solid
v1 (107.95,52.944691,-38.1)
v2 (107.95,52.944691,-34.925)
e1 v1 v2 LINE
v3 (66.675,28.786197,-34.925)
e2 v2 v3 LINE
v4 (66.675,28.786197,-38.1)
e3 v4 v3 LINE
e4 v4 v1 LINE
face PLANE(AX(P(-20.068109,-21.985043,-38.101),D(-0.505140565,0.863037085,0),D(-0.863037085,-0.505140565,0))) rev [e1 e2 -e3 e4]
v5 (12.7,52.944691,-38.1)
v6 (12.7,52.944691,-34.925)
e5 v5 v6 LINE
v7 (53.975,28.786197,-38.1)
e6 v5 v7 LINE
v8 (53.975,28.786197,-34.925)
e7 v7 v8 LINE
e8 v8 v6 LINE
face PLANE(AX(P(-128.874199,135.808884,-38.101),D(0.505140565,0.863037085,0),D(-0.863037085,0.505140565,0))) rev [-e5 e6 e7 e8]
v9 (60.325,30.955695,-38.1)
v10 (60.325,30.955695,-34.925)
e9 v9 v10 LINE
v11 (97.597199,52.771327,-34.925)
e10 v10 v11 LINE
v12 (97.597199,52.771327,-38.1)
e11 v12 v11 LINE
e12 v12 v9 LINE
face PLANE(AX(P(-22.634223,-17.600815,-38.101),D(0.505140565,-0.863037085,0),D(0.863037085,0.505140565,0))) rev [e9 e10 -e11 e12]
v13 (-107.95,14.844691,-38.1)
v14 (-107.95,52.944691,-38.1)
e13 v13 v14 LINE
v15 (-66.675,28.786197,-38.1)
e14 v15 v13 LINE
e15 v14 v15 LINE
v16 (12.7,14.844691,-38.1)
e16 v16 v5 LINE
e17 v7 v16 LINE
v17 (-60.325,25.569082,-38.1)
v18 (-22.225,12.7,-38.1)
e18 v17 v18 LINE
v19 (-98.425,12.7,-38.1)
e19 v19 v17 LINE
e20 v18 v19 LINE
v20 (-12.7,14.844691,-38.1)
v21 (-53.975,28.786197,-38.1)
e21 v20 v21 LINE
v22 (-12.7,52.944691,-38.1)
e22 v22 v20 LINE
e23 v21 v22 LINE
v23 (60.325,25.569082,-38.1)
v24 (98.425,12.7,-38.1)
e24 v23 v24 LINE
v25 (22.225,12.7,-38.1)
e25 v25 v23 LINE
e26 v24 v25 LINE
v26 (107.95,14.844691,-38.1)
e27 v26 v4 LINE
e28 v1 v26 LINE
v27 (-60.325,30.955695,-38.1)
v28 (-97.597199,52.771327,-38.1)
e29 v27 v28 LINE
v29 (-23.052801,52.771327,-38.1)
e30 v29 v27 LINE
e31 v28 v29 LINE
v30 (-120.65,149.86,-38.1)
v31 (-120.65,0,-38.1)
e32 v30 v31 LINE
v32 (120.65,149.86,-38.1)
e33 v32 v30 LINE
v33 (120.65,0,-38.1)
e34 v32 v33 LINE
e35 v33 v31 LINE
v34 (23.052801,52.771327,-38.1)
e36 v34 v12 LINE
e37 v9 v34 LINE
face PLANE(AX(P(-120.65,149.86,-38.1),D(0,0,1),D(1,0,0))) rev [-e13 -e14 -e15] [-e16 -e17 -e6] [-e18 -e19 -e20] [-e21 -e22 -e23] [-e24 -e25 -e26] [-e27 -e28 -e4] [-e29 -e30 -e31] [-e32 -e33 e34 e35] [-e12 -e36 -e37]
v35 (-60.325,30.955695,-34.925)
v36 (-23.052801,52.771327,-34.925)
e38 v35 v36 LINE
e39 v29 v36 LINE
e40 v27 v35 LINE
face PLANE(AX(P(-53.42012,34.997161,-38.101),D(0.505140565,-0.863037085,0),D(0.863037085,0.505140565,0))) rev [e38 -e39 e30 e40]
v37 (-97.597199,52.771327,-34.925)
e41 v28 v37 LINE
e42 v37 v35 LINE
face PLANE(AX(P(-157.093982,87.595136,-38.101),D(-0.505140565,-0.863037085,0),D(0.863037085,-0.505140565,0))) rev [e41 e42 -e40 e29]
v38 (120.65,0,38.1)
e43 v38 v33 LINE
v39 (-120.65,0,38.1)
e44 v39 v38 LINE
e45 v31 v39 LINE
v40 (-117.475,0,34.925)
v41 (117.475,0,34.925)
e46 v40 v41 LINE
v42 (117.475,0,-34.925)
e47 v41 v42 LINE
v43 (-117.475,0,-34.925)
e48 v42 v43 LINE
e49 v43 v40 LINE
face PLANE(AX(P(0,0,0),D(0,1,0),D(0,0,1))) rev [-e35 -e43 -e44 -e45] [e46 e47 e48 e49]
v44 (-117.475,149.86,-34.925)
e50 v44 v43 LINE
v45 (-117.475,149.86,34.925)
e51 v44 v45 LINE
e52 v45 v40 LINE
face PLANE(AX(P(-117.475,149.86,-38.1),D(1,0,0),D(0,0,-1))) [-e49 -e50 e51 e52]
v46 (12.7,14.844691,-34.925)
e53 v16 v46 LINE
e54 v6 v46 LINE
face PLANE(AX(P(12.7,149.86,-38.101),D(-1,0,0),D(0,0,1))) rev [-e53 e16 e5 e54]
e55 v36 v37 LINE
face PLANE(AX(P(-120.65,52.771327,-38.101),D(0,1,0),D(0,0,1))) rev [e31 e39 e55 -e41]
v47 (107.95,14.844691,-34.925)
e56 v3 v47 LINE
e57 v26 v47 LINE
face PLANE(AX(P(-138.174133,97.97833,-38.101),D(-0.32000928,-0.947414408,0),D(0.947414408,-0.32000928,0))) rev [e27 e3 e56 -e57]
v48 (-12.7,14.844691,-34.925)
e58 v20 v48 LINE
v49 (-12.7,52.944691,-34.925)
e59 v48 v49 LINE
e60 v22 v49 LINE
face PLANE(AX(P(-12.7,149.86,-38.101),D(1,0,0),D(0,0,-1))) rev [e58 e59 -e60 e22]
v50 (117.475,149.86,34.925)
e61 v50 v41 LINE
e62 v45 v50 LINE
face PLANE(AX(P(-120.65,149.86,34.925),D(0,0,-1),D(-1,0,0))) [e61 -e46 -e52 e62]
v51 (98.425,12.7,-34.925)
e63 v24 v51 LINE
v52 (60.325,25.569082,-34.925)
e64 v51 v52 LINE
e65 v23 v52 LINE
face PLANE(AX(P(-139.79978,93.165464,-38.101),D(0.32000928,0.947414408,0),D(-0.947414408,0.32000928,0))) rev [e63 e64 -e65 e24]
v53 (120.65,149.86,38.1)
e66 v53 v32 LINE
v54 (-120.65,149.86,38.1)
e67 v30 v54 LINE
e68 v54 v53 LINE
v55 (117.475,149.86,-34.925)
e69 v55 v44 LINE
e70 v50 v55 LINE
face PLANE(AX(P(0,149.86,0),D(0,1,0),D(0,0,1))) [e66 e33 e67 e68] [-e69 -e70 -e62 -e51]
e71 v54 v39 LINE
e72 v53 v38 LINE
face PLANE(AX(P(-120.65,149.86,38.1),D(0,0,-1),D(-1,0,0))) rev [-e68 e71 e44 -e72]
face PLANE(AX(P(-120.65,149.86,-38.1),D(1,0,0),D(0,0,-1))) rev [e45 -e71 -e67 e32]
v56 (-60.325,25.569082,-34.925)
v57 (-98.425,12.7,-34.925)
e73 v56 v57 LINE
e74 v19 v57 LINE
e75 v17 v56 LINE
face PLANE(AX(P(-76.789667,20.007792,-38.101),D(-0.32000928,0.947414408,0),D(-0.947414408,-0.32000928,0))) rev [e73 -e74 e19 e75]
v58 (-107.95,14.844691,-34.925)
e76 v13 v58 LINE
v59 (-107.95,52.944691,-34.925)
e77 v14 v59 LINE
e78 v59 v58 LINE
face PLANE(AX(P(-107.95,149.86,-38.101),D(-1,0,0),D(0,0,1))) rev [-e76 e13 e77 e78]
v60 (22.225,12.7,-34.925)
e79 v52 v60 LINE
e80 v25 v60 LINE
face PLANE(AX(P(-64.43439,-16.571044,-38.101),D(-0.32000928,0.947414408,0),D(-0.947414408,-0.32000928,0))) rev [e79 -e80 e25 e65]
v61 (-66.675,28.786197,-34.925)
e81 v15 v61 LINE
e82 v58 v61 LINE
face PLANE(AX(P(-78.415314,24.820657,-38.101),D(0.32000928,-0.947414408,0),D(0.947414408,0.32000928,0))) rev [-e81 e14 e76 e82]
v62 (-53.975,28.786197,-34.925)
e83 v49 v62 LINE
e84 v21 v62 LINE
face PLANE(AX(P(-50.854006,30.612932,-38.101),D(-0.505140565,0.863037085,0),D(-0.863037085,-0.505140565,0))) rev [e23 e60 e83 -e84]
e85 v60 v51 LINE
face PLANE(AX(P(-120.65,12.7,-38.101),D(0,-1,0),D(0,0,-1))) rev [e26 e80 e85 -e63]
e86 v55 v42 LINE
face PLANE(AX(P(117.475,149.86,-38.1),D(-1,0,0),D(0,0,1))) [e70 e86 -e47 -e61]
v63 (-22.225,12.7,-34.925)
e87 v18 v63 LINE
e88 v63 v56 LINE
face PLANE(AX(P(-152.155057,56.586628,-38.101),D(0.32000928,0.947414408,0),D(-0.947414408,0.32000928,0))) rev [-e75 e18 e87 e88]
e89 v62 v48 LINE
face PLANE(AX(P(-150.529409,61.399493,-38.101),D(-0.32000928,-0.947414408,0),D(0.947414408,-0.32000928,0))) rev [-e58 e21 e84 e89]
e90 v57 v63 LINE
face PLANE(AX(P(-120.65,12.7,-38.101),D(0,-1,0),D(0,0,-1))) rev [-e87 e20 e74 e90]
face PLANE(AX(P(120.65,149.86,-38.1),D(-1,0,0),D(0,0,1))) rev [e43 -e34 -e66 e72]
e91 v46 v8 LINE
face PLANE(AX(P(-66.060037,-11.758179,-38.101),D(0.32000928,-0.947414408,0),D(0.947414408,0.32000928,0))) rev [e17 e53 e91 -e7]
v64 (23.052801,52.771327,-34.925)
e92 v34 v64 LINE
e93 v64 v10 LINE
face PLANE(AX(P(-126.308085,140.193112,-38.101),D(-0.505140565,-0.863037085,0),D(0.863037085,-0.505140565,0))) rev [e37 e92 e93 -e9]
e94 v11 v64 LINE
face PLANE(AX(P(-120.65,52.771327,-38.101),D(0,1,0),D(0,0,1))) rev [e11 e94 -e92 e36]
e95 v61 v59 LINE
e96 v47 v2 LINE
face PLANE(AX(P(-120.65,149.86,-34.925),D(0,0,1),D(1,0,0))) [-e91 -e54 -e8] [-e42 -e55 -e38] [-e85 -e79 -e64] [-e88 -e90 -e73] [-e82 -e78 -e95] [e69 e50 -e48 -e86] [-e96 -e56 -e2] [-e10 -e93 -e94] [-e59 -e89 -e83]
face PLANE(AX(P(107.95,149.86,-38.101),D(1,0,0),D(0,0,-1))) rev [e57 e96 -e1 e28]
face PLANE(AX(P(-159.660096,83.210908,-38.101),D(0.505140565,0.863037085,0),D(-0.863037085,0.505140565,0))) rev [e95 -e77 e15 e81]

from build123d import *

# Parameters (mm, degrees)
SKETCH1_W           = 241.3
SKETCH1_H           = 76.2
SKETCH1_W_2         = 205.74
SKETCH1_H_2         = 5.588
BOSS_EXTRUDE1_DEPTH = 149.86
SHELL1_T            = -3.175
CUT_EXTRUDE1_REACH  = 281.957
CUT_EXTRUDE1_START  = -73.025


with BuildPart() as part:
    # Sketch1 → Boss-Extrude1 (new body)
    with BuildSketch(Plane(origin=(0, 0, 0), x_dir=(1, 0, 0), z_dir=(0, 1, 0))):
        Rectangle(SKETCH1_W, SKETCH1_H)
        Rectangle(SKETCH1_W_2, SKETCH1_H_2, mode=Mode.SUBTRACT)
    extrude(amount=BOSS_EXTRUDE1_DEPTH)

    # Shell1
    shell1_openings = [part.faces().sort_by_distance(p)[0] for p in [
        (0, 0, -35.569542927),
        (0, 74.93, -2.794),
        (0, 74.93, 2.794),
        (-102.87, 74.93, 0),
        (102.87, 74.93, 0),
        (0, 149.86, -35.569542927),
    ]]
    offset(amount=SHELL1_T, openings=shell1_openings, kind=Kind.INTERSECTION)

    # Sketch3 → Cut-Extrude1 (cut, up to next)
    with BuildSketch(Plane.XY.offset(38.1).offset(CUT_EXTRUDE1_START), mode=Mode.PRIVATE) as cut_extrude1_sk1:
        Polygon((107.95, 52.944691481), (66.675, 28.786196813), (107.95, 14.844691481), align=None)
    cut_extrude1_tool1 = extrude(cut_extrude1_sk1.sketch, amount=-CUT_EXTRUDE1_REACH, mode=Mode.PRIVATE) & part.part
    # Sketch3 → Cut-Extrude1 (cut, up to next)
    with BuildSketch(Plane.XY.offset(38.1).offset(CUT_EXTRUDE1_START), mode=Mode.PRIVATE) as cut_extrude1_sk2:
        Polygon((98.425, 12.7), (60.325, 25.569081846), (22.225, 12.7), align=None)
    cut_extrude1_tool2 = extrude(cut_extrude1_sk2.sketch, amount=-CUT_EXTRUDE1_REACH, mode=Mode.PRIVATE) & part.part
    # Sketch3 → Cut-Extrude1 (cut, up to next)
    with BuildSketch(Plane.XY.offset(38.1).offset(CUT_EXTRUDE1_START), mode=Mode.PRIVATE) as cut_extrude1_sk3:
        Polygon((97.597199346, 52.771327471), (60.325, 30.955695027), (23.052800654, 52.771327471), align=None)
    cut_extrude1_tool3 = extrude(cut_extrude1_sk3.sketch, amount=-CUT_EXTRUDE1_REACH, mode=Mode.PRIVATE) & part.part
    # Sketch3 → Cut-Extrude1 (cut, up to next)
    with BuildSketch(Plane.XY.offset(38.1).offset(CUT_EXTRUDE1_START), mode=Mode.PRIVATE) as cut_extrude1_sk4:
        Polygon((53.975, 28.786196813), (12.7, 14.844691481), (12.7, 52.944691481), align=None)
    cut_extrude1_tool4 = extrude(cut_extrude1_sk4.sketch, amount=-CUT_EXTRUDE1_REACH, mode=Mode.PRIVATE) & part.part
    # Sketch3 → Cut-Extrude1 (cut, up to next)
    with BuildSketch(Plane.XY.offset(38.1).offset(CUT_EXTRUDE1_START), mode=Mode.PRIVATE) as cut_extrude1_sk5:
        Polygon((-107.95, 52.944691481), (-66.675, 28.786196813), (-107.95, 14.844691481), align=None)
    cut_extrude1_tool5 = extrude(cut_extrude1_sk5.sketch, amount=-CUT_EXTRUDE1_REACH, mode=Mode.PRIVATE) & part.part
    # Sketch3 → Cut-Extrude1 (cut, up to next)
    with BuildSketch(Plane.XY.offset(38.1).offset(CUT_EXTRUDE1_START), mode=Mode.PRIVATE) as cut_extrude1_sk6:
        Polygon((-22.225, 12.7), (-60.325, 25.569081846), (-98.425, 12.7), align=None)
    cut_extrude1_tool6 = extrude(cut_extrude1_sk6.sketch, amount=-CUT_EXTRUDE1_REACH, mode=Mode.PRIVATE) & part.part
    # Sketch3 → Cut-Extrude1 (cut, up to next)
    with BuildSketch(Plane.XY.offset(38.1).offset(CUT_EXTRUDE1_START), mode=Mode.PRIVATE) as cut_extrude1_sk7:
        Polygon((-12.7, 52.944691481), (-53.975, 28.786196813), (-12.7, 14.844691481), align=None)
    cut_extrude1_tool7 = extrude(cut_extrude1_sk7.sketch, amount=-CUT_EXTRUDE1_REACH, mode=Mode.PRIVATE) & part.part
    # Sketch3 → Cut-Extrude1 (cut, up to next)
    with BuildSketch(Plane.XY.offset(38.1).offset(CUT_EXTRUDE1_START), mode=Mode.PRIVATE) as cut_extrude1_sk8:
        Polygon((-97.597199346, 52.771327471), (-60.325, 30.955695027), (-23.052800654, 52.771327471), align=None)
    cut_extrude1_tool8 = extrude(cut_extrude1_sk8.sketch, amount=-CUT_EXTRUDE1_REACH, mode=Mode.PRIVATE) & part.part
    add(cut_extrude1_tool1.solids().sort_by_distance((94.191667, 32.19186, -34.925))[0], mode=Mode.SUBTRACT)
    add(cut_extrude1_tool2.solids().sort_by_distance((60.325, 16.989694, -34.925))[0], mode=Mode.SUBTRACT)
    add(cut_extrude1_tool3.solids().sort_by_distance((60.325, 45.49945, -34.925))[0], mode=Mode.SUBTRACT)
    add(cut_extrude1_tool4.solids().sort_by_distance((26.458333, 32.19186, -34.925))[0], mode=Mode.SUBTRACT)
    add(cut_extrude1_tool5.solids().sort_by_distance((-94.191667, 32.19186, -34.925))[0], mode=Mode.SUBTRACT)
    add(cut_extrude1_tool6.solids().sort_by_distance((-60.325, 16.989694, -34.925))[0], mode=Mode.SUBTRACT)
    add(cut_extrude1_tool7.solids().sort_by_distance((-26.458333, 32.19186, -34.925))[0], mode=Mode.SUBTRACT)
    add(cut_extrude1_tool8.solids().sort_by_distance((-60.325, 45.49945, -34.925))[0], mode=Mode.SUBTRACT)


solid = part.part
